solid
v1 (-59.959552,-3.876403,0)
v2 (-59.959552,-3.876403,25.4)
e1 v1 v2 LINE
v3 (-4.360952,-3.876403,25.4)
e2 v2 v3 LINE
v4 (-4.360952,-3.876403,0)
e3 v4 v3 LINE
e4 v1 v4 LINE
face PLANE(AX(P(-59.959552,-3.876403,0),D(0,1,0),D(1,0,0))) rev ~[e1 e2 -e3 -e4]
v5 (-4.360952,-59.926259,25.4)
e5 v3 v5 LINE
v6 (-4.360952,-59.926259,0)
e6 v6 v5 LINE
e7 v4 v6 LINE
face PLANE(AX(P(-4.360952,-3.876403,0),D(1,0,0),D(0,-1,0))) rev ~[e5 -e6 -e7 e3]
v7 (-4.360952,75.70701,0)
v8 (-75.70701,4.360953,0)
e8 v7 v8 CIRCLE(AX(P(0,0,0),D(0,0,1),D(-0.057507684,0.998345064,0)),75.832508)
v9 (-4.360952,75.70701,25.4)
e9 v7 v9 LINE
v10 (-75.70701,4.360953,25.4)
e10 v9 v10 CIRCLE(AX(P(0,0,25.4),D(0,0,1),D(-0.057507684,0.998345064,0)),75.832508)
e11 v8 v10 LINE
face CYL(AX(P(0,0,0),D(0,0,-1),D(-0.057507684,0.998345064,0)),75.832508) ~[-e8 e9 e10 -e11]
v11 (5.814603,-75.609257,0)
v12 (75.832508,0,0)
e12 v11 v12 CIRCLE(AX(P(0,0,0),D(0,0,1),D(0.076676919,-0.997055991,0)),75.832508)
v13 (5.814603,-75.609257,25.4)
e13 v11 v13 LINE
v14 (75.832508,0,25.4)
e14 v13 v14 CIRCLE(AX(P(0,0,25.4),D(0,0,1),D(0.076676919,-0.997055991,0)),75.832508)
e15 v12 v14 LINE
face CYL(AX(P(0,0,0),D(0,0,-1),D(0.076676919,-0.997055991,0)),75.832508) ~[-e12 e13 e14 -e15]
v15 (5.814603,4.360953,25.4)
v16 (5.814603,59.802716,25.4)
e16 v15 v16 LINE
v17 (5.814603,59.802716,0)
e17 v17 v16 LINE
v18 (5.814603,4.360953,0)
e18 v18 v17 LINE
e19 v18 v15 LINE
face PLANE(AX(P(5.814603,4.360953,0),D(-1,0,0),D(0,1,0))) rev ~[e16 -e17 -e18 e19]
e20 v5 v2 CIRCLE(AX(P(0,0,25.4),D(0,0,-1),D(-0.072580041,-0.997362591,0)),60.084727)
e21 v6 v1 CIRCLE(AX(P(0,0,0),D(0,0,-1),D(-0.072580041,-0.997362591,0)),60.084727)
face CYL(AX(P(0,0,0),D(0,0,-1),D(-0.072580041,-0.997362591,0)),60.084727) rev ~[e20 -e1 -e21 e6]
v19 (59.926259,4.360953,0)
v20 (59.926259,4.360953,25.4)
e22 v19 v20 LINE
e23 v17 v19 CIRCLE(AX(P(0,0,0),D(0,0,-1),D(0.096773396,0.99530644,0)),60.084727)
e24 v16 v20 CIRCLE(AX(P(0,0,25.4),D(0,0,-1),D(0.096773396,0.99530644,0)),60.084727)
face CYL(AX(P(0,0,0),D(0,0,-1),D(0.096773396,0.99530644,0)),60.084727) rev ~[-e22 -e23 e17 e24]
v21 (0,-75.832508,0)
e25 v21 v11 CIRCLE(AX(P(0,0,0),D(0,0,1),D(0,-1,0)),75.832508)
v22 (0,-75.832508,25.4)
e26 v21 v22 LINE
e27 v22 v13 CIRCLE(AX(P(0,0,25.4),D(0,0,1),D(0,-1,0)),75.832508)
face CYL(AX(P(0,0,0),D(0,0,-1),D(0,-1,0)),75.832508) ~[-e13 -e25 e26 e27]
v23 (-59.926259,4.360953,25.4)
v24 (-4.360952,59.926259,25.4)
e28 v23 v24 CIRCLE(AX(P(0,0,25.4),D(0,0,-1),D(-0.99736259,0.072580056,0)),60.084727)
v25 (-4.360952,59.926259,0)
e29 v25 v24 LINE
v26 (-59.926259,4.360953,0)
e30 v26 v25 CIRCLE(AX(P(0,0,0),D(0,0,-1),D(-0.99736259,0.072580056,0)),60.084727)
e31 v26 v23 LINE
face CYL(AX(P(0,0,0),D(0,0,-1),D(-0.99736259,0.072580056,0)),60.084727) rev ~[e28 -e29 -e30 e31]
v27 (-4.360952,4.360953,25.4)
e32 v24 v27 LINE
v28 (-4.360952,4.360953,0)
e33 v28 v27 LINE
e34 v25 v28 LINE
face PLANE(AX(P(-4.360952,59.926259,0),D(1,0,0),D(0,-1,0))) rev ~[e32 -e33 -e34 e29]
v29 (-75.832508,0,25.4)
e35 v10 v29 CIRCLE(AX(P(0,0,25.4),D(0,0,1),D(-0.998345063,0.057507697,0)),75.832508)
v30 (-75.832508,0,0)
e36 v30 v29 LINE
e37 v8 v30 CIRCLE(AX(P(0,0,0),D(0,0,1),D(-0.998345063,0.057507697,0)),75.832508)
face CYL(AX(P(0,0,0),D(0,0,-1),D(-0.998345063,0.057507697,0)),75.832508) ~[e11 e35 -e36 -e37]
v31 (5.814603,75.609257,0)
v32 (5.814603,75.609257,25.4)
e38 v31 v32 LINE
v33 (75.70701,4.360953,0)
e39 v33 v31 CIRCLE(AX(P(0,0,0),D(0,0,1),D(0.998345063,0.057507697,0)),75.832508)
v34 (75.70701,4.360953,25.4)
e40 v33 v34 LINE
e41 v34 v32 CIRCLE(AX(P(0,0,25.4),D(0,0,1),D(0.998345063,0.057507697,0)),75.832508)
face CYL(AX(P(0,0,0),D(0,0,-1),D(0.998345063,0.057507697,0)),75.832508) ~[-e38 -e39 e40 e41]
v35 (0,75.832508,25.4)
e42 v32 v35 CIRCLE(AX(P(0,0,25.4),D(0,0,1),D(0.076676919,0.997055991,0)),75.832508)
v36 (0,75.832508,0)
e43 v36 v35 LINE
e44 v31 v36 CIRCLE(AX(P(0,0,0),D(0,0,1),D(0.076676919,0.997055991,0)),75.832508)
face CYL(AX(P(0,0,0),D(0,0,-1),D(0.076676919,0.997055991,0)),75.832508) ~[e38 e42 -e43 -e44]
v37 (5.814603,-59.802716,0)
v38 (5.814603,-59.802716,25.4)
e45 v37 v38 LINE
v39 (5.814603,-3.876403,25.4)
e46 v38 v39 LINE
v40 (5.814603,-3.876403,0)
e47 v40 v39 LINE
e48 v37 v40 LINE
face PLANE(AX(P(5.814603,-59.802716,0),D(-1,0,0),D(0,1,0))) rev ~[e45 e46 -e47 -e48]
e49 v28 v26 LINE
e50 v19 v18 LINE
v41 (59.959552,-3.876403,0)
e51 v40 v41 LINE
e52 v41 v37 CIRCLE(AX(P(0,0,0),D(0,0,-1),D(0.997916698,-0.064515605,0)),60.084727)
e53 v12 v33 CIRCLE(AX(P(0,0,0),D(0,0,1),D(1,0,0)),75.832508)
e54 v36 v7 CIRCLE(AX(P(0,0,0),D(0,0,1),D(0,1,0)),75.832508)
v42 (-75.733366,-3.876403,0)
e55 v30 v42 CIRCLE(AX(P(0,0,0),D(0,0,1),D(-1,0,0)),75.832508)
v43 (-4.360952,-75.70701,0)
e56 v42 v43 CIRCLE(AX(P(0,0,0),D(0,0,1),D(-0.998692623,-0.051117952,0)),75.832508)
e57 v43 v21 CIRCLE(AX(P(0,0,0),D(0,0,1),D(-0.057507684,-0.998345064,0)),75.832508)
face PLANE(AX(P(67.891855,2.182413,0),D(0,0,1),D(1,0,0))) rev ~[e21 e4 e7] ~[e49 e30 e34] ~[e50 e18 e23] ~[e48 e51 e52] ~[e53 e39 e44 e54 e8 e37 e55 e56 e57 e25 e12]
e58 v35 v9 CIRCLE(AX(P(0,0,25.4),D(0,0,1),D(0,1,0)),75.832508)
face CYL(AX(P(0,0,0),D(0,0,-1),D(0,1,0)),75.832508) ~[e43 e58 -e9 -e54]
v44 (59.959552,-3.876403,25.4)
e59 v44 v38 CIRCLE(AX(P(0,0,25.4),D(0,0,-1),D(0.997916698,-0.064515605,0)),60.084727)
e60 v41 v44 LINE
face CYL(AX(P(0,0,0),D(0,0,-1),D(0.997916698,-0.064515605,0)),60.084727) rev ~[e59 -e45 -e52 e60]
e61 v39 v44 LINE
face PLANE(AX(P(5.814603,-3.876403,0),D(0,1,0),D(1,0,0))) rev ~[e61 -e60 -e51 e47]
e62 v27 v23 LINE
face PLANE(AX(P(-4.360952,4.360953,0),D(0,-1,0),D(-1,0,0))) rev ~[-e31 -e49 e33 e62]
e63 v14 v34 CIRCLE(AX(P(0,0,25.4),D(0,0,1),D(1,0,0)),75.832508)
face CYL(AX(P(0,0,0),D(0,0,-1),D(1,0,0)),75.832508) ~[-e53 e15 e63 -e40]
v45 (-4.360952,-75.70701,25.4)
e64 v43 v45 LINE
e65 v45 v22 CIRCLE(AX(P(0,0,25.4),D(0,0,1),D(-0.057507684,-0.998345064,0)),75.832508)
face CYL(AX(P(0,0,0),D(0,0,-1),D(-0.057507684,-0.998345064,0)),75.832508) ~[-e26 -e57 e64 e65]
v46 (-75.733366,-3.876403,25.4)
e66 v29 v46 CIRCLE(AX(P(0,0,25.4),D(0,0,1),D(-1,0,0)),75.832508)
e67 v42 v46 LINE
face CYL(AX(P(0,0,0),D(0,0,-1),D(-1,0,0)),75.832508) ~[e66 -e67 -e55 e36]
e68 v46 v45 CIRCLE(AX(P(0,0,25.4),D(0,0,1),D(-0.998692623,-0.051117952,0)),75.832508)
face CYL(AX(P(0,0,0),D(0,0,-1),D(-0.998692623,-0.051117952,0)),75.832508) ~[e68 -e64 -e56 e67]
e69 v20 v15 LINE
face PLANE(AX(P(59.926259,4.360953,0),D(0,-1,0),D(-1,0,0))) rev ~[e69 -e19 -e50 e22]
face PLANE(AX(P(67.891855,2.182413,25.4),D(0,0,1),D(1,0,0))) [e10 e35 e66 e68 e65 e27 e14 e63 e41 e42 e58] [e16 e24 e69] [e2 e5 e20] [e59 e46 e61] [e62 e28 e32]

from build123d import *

# Parameters (mm, degrees)
F0_W     = 5.8146030642
F0_H     = 3.8764025085
F1_DEPTH = 25.4


with BuildPart() as f1:
    # F0 (on Top) → F1 (new body)
    with BuildSketch(Plane.XY):
        with BuildLine():
            Line((60.0847271035, 0), (75.8325080935, 0))
            ThreePointArc((75.8325080935, 0), (75.8011270946, 2.1813791382), (75.7070100699, 4.3609528802))
            Line((75.7070100699, 4.3609528802), (59.9262590279, 4.3609528802))
            ThreePointArc((59.9262590279, 4.3609528802), (60.0450970152, 2.1819155663), (60.0847271035, 0))
        make_face()
        with BuildLine():
            ThreePointArc((5.8146030642, -75.6092565428), (55.6394878556, -51.524913148), (75.8325080935, 0))
            Line((75.8325080935, 0), (60.0847271035, 0))
            ThreePointArc((60.0847271035, 0), (60.0534252964, -1.939211508), (59.9595524891, -3.8764025085))
            ThreePointArc((59.9595524891, -3.8764025085), (43.1682524028, -41.793258016), (5.8146030642, -59.8027158439))
            Line((5.8146030642, -59.8027158439), (5.8146030642, -75.6092565428))
        make_face()
        with BuildLine():
            Line((59.9262590279, 4.3609528802), (75.7070100699, 4.3609528802))
            ThreePointArc((75.7070100699, 4.3609528802), (54.1343102449, 53.1041028364), (5.8146030642, 75.6092565428))
            Line((5.8146030642, 75.6092565428), (5.8146030642, 59.8027158439))
            ThreePointArc((5.8146030642, 59.8027158439), (42.9989826308, 41.9673911962), (59.9262590279, 4.3609528802))
        make_face()
        with BuildLine():
            ThreePointArc((0, -75.8325080935), (2.9094436775, -75.7766746515), (5.8146030642, -75.6092565428))
            Line((5.8146030642, -75.6092565428), (5.8146030642, -59.8027158439))
            ThreePointArc((5.8146030642, -59.8027158439), (2.9107189466, -60.0141828763), (0, -60.0847271035))
            Line((0, -60.0847271035), (0, -75.8325080935))
        make_face()
        with BuildLine():
            Line((5.8146030642, 0), (60.0847271035, 0))
            ThreePointArc((60.0847271035, 0), (60.0450970152, 2.1819155663), (59.9262590279, 4.3609528802))
            Line((59.9262590279, 4.3609528802), (5.8146030642, 4.3609528802))
            Line((5.8146030642, 4.3609528802), (0, 4.3609528802))
            Line((0, 4.3609528802), (0, 0))
            Line((0, 0), (5.8146030642, 0))
        make_face()
        with BuildLine():
            ThreePointArc((59.9595524891, -3.8764025085), (60.0534252964, -1.939211508), (60.0847271035, 0))
            Line((60.0847271035, 0), (5.8146030642, 0))
            Line((5.8146030642, 0), (5.8146030642, -3.8764025085))
            Line((5.8146030642, -3.8764025085), (59.9595524891, -3.8764025085))
        make_face()
        with BuildLine():
            Line((5.8146030642, 59.8027158439), (5.8146030642, 75.6092565428))
            ThreePointArc((5.8146030642, 75.6092565428), (2.9094436775, 75.7766746515), (0, 75.8325080935))
            Line((0, 75.8325080935), (0, 60.0847271035))
            ThreePointArc((0, 60.0847271035), (2.9107189466, 60.0141828763), (5.8146030642, 59.8027158439))
        make_face()
        with BuildLine():
            ThreePointArc((-4.3609519489, -75.7070101236), (-2.1813786719, -75.801127108), (0, -75.8325080935))
            Line((0, -75.8325080935), (0, -60.0847271035))
            ThreePointArc((0, -60.0847271035), (-2.1819150998, -60.0450970321), (-4.3609519489, -59.9262590956))
            Line((-4.3609519489, -59.9262590956), (-4.3609519489, -75.7070101236))
        make_face()
        with BuildLine():
            ThreePointArc((0, -60.0847271035), (2.9107189466, -60.0141828763), (5.8146030642, -59.8027158439))
            Line((5.8146030642, -59.8027158439), (5.8146030642, -3.8764025085))
            Line((5.8146030642, -3.8764025085), (0, -3.8764025085))
            Line((0, -3.8764025085), (0, -60.0847271035))
        make_face()
        with Locations((2.9073015321, -1.9382012542)):
            Rectangle(F0_W, F0_H)
        with BuildLine():
            Line((0, 60.0847271035), (0, 75.8325080935))
            ThreePointArc((0, 75.8325080935), (-2.1813786719, 75.801127108), (-4.3609519489, 75.7070101236))
            Line((-4.3609519489, 75.7070101236), (-4.3609519489, 59.9262590956))
            ThreePointArc((-4.3609519489, 59.9262590956), (-2.1819150998, 60.0450970321), (0, 60.0847271035))
        make_face()
        with BuildLine():
            Line((5.8146030642, 4.3609528802), (5.8146030642, 59.8027158439))
            ThreePointArc((5.8146030642, 59.8027158439), (2.9107189466, 60.0141828763), (0, 60.0847271035))
            Line((0, 60.0847271035), (0, 4.3609528802))
            Line((0, 4.3609528802), (5.8146030642, 4.3609528802))
        make_face()
        with BuildLine():
            ThreePointArc((-75.733366407, -3.8764025085), (-53.7929735729, -53.4498388953), (-4.3609519489, -75.7070101236))
            Line((-4.3609519489, -75.7070101236), (-4.3609519489, -59.9262590956))
            ThreePointArc((-4.3609519489, -59.9262590956), (-42.6576889746, -42.3142529468), (-59.9595524891, -3.8764025085))
            Line((-59.9595524891, -3.8764025085), (-75.733366407, -3.8764025085))
        make_face()
        with BuildLine():
            ThreePointArc((-4.3609519489, -59.9262590956), (-2.1819150998, -60.0450970321), (0, -60.0847271035))
            Line((0, -60.0847271035), (0, -3.8764025085))
            Line((0, -3.8764025085), (-4.3609519489, -3.8764025085))
            Line((-4.3609519489, -3.8764025085), (-4.3609519489, -59.9262590956))
        make_face()
        with BuildLine():
            Line((0, -3.8764025085), (0, 0))
            Line((0, 0), (0, 4.3609528802))
            Line((0, 4.3609528802), (0, 60.0847271035))
            ThreePointArc((0, 60.0847271035), (-2.1819150998, 60.0450970321), (-4.3609519489, 59.9262590956))
            Line((-4.3609519489, 59.9262590956), (-4.3609519489, 4.3609528802))
            Line((-4.3609519489, 4.3609528802), (-4.3609519489, 0))
            Line((-4.3609519489, 0), (-4.3609519489, -3.8764025085))
            Line((-4.3609519489, -3.8764025085), (0, -3.8764025085))
        make_face()
        with BuildLine():
            Line((-4.3609519489, 59.9262590956), (-4.3609519489, 75.7070101236))
            ThreePointArc((-4.3609519489, 75.7070101236), (-53.6216803775, 53.6216810371), (-75.7070100699, 4.3609528802))
            Line((-75.7070100699, 4.3609528802), (-59.9262590279, 4.3609528802))
            ThreePointArc((-59.9262590279, 4.3609528802), (-42.4863176505, 42.4863183108), (-4.3609519489, 59.9262590956))
        make_face()
        with BuildLine():
            ThreePointArc((-75.8325080935, 0), (-75.8077186201, -1.938835055), (-75.733366407, -3.8764025085))
            Line((-75.733366407, -3.8764025085), (-59.9595524891, -3.8764025085))
            ThreePointArc((-59.9595524891, -3.8764025085), (-60.0534252964, -1.939211508), (-60.0847271035, 0))
            Line((-60.0847271035, 0), (-75.8325080935, 0))
        make_face()
        with BuildLine():
            Line((-59.9262590279, 4.3609528802), (-75.7070100699, 4.3609528802))
            ThreePointArc((-75.7070100699, 4.3609528802), (-75.8011270946, 2.1813791382), (-75.8325080935, 0))
            Line((-75.8325080935, 0), (-60.0847271035, 0))
            ThreePointArc((-60.0847271035, 0), (-60.0450970152, 2.1819155663), (-59.9262590279, 4.3609528802))
        make_face()
        with BuildLine():
            ThreePointArc((-60.0847271035, 0), (-60.0534252964, -1.939211508), (-59.9595524891, -3.8764025085))
            Line((-59.9595524891, -3.8764025085), (-4.3609519489, -3.8764025085))
            Line((-4.3609519489, -3.8764025085), (-4.3609519489, 0))
            Line((-4.3609519489, 0), (-60.0847271035, 0))
        make_face()
        with BuildLine():
            Line((-4.3609519489, 4.3609528802), (-59.9262590279, 4.3609528802))
            ThreePointArc((-59.9262590279, 4.3609528802), (-60.0450970152, 2.1819155663), (-60.0847271035, 0))
            Line((-60.0847271035, 0), (-4.3609519489, 0))
            Line((-4.3609519489, 0), (-4.3609519489, 4.3609528802))
        make_face()
    extrude(amount=F1_DEPTH)


solid = f1.part
